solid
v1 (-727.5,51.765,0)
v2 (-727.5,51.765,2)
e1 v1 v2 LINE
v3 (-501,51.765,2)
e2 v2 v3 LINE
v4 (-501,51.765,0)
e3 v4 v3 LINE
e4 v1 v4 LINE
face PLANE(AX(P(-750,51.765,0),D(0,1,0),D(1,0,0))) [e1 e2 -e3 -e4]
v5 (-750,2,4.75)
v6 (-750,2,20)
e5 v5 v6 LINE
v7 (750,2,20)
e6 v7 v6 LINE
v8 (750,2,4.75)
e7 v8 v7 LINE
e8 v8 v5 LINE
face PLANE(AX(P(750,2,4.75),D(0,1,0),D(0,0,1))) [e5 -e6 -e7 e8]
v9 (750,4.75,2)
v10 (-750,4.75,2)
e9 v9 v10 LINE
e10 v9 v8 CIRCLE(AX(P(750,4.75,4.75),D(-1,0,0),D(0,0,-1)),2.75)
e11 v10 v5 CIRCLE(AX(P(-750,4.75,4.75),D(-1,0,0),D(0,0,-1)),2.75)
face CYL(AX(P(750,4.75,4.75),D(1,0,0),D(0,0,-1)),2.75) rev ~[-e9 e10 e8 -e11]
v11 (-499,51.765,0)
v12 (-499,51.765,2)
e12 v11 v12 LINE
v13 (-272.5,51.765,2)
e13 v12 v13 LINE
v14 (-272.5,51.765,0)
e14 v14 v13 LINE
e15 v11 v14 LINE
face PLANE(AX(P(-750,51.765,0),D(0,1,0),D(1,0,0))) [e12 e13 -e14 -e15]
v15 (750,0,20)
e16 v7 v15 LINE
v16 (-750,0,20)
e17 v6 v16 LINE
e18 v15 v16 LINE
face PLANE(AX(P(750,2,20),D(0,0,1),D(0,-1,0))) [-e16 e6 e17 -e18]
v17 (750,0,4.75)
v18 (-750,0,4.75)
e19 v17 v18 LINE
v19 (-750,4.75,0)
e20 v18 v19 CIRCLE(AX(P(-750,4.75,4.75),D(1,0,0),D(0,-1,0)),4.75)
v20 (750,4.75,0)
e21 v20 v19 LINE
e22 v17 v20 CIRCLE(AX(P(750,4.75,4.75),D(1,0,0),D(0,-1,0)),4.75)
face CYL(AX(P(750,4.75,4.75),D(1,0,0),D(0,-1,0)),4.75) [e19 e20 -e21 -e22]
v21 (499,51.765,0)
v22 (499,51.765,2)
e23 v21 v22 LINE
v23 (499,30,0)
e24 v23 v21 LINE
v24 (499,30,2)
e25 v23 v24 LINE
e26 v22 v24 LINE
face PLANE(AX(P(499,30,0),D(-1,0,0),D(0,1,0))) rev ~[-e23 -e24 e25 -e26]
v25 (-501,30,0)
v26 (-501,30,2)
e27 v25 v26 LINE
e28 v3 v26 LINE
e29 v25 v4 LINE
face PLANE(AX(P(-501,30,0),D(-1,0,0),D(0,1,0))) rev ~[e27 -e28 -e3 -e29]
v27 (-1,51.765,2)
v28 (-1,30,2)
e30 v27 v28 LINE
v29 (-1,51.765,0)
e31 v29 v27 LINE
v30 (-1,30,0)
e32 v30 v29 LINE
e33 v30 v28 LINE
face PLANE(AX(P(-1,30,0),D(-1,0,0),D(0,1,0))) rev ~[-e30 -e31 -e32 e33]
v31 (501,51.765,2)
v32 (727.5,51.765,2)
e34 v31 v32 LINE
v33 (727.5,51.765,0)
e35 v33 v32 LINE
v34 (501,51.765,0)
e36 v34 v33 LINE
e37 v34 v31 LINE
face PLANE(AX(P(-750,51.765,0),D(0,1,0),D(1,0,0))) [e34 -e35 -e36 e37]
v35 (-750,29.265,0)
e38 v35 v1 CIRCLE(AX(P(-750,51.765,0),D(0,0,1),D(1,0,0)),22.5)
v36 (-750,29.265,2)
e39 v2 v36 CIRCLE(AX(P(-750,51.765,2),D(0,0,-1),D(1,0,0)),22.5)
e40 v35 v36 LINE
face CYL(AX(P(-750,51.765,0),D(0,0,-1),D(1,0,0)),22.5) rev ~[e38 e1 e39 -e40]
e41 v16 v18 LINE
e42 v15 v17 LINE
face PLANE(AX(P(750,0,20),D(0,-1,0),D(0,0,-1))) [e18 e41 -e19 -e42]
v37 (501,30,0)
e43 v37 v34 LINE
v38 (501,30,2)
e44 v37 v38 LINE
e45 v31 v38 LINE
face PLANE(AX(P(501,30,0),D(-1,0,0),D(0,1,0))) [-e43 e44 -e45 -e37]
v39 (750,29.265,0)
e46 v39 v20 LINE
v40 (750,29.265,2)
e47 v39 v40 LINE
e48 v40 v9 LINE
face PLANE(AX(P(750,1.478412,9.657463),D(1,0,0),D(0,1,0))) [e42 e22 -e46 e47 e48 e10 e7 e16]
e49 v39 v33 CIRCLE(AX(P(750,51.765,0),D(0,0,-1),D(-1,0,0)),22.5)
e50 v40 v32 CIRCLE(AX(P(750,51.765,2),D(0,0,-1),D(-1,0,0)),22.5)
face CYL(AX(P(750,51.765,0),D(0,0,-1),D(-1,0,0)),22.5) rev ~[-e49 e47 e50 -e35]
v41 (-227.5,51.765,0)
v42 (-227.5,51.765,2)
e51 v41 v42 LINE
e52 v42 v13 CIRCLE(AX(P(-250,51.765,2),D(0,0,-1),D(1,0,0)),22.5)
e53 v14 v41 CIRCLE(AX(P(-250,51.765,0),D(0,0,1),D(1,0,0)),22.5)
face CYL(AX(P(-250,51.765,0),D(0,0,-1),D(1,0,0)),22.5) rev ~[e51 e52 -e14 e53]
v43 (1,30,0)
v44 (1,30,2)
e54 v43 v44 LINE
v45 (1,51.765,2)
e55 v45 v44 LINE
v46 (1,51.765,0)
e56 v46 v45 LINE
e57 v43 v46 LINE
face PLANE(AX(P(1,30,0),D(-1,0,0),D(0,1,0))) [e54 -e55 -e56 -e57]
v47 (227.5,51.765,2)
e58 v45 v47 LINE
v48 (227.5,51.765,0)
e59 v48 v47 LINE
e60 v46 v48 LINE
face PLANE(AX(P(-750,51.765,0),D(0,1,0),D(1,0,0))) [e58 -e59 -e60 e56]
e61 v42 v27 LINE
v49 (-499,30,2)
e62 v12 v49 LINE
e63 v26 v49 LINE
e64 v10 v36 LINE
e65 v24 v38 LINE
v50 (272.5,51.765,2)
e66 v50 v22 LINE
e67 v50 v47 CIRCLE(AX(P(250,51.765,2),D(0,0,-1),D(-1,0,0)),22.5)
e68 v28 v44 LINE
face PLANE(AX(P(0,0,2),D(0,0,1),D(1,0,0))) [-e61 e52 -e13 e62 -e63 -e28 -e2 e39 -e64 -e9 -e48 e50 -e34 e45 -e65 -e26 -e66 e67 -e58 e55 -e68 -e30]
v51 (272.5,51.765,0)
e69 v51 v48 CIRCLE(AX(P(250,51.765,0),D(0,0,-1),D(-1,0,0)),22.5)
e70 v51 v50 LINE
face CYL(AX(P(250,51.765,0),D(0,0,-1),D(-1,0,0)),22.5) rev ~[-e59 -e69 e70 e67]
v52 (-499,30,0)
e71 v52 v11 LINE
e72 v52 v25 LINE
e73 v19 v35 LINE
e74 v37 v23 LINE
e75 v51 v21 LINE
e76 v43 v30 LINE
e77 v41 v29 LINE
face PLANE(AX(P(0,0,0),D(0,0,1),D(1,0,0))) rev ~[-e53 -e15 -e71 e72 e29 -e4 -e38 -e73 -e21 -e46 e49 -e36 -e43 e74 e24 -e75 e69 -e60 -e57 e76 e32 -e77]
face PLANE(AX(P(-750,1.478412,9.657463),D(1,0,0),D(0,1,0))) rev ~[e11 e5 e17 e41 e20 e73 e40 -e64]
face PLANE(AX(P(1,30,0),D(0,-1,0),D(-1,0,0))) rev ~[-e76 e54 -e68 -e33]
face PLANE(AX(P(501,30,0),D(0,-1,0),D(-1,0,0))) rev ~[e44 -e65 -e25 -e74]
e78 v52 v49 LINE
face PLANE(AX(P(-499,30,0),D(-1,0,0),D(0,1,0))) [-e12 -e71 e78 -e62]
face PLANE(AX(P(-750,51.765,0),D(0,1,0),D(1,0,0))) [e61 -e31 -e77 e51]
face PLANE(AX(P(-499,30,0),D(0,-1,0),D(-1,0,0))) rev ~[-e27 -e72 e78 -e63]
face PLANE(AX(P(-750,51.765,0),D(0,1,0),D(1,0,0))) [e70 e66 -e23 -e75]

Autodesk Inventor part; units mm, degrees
ref_plane "YZ Plane" through (0, 0, 0) normal (1, 0, 0) x (0, 1, 0)
ref_plane "XZ Plane" through (0, 0, 0) normal (0, 1, 0) x (-1, 0, 0)
ref_plane "XY Plane" through (0, 0, 0) normal (0, 0, 1) x (1, 0, 0)
sketch "Sketch1" plane through (0, 0, 0) normal (0, 0, 1) x (1, 0, 0)
  line L0 (-750, 51.765) -> (750, 51.765)
  line L1 (750, 51.765) -> (750, 0)
  line L2 (750, 0) -> (-750, 0)
  line L3 (-750, 0) -> (-750, 51.765)
  point P0 (0, 0)
  point P1 (0, 0)
  dimension "d0" = 1500
  dimension "d1" = 51.765
extrude "Plate1" add sketch "Sketch1" along normal blind 2
sketch "Sketch2" plane through (750, 2, 0) normal (0, -1, 0) x (1, 0, 0)
  line L0 (-1500, 0) -> (0, 0)
  line L1 (0, 0) -> (0, 20)
  line L2 (0, 20) -> (-1500, 20)
  line L3 (-1500, 20) -> (-1500, 0)
edge flange "Flange1" height 20 angle 90 thickness 2 bend radius 2.75 thickness toward (0, -1, 0) relief round relief width 2 relief depth 1 edges at (0, 0, 2) wall of the first edge with corners at (-750, 2, 0) (750, 2, 0) (750, 2, 20) (-750, 2, 20)
bend "Bend1"
corner "Corner1"
sketch "Sketch5" plane through (0, 0, 0) normal (0, 0, -1) x (-1, 0, 0)
  line L0 (750, 51.765) -> (-750, 51.765) projected
  line L1 (-1, 30) -> (-1, 51.765)
  line L2 (750, 0) -> (-750, 0) projected
  line L3 (-1, 30) -> (1, 30)
  line L4 (1, 30) -> (1, 51.765)
  point P0 (0, 0)
  point P1 (0, 30)
  point P2 (0, 0)
  dimension "d27" = 2
  dimension "d29" = 30
extrude "Extrusion1" cut sketch "Sketch5" against normal through all
pattern_linear "Rectangular Pattern1" count 3 spacing 500 along (1, 0, 0) of "Extrusion1" first direction both ways yes
sketch "Sketch6" plane through (0, 0, 0) normal (0, 0, -1) x (-1, 0, 0)
  line L0 (-750, 51.765) -> (-750, 4.75) projected
  circle A0 centre (-750, 51.765) radius 22.5
  line L1 (-750, 51.765) -> (750, 51.765) projected
  line L2 (-499, 30) -> (-501, 30) construction
  line L3 (-499, 30) -> (-1, 30) construction
  line L4 (-1, 30) -> (-1, 51.765) construction
  line L5 (-1, 51.765) -> (-499, 51.765) projected
  circle A1 centre (-250, 51.765) radius 22.5
  point P0 (0, 0)
  point P1 (-727.5, 51.765)
  point P2 (-750, 29.265)
  point P3 (-250, 30)
  point P4 (-227.5, 51.765)
  point P5 (-272.5, 51.765)
  dimension "d24" = 45
extrude "Extrusion2" cut sketch "Sketch6" against normal through all contours L1 A0 L0 | L1 A1 picked at (-748.3311, 36.953) picked at (-248.2369, 40.8343)
mirror "Mirror1" about plane through (0, 0, 0) normal (1, 0, 0) of "Extrusion2"
sketch "Sketch7" plane through (0, 0, 2) normal (0, 0, 1) x (1, 0, 0)
  arc A0 (-750, 29.265) -> (-727.5, 51.765) centre (-750, 51.765) ccw projected
  line L0 (-750, 4.75) -> (-750, 29.265) projected
  line L1 (-750, 4.75) -> (750, 4.75) projected
  line L2 (750, 29.265) -> (750, 4.75) projected
  arc A1 (727.5, 51.765) -> (750, 29.265) centre (750, 51.765) ccw projected
  line L3 (501, 51.765) -> (727.5, 51.765) projected
  line L4 (501, 51.765) -> (501, 30) projected
  line L5 (501, 30) -> (499, 30) projected
  line L6 (499, 30) -> (499, 51.765) projected
  line L7 (1, 51.765) -> (227.5, 51.765) projected
  line L8 (1, 51.765) -> (1, 30) projected
  line L9 (1, 30) -> (-1, 30) projected
  line L10 (-1, 30) -> (-1, 51.765) projected
  line L11 (-499, 51.765) -> (-272.5, 51.765) projected
  line L12 (-499, 51.765) -> (-499, 30) projected
  line L13 (-499, 30) -> (-501, 30) projected
  line L14 (-501, 30) -> (-501, 51.765) projected
  line L15 (-727.5, 51.765) -> (-501, 51.765) projected
  line L16 (649, 50.765) -> (651, 50.765)
  line L17 (651, 50.765) -> (651, 51.765)
  line L18 (651, 51.765) -> (649, 51.765)
  line L19 (649, 51.765) -> (649, 50.765)
  line L20 (650, 4.75) -> (650, 51.765) construction
  line L21 (272.5, 51.765) -> (499, 51.765) projected
  arc A2 (227.5, 51.765) -> (272.5, 51.765) centre (250, 51.765) ccw projected
  line L22 (-227.5, 51.765) -> (-1, 51.765) projected
  arc A3 (-272.5, 51.765) -> (-227.5, 51.765) centre (-250, 51.765) ccw projected
  point P0 (0, 0)
  point P1 (650, 50.765)
  point P2 (649, 51.265)
  point P3 (650, 28.2575)
  dimension "d30" = 2
  dimension "d31" = 1
  dimension "d33" = 100
extrude "Extrusion3" [suppressed]
mirror "Mirror2" [suppressed]
sketch "Sketch9" plane through (0, 0, 2) normal (0, 0, 1) x (1, 0, 0)
  line L0 (494, 46.765) -> (494, 34.765) construction
  line L1 (494, 34.765) -> (294, 34.765) construction
  line L2 (294, 34.765) -> (294, 46.765) construction
  line L3 (294, 46.765) -> (494, 46.765) construction
  line L4 (499, 30) -> (499, 51.765) projected
  line L5 (1, 51.765) -> (499, 51.765) projected
  point P0 (0, 0)
  dimension "d38" = 200
  dimension "d39" = 12
  dimension "d42" = 5
  dimension "d43" = 5
mark "Mark3"
equation "\"d1\" = Стрингер_1"
equation "\"d27\" = d18"
equation "\"d29\" = Стрингер_глубина_паза"
equation "\"d43\" = d42"
equation "\"d2\" = Thickness"
equation "\"d3\" = BendReliefWidth"
equation "\"d4\" = BendReliefDepth"
equation "\"d5\" = MinimumRemnant"
equation "\"d6\" = TransitionRadius"
equation "\"d9\" = BendRadius"
equation "\"d10\" = CornerReliefSize"
equation "\"d11\" = GapSize"
equation "\"d12\" = JacobiRadiusSize"
equation "\"BendReliefWidth\" = Thickness"
equation "\"BendReliefDepth\" = 0.5 * Thickness"
equation "\"CornerReliefSize\" = 4 * Thickness"
equation "\"MinimumRemnant\" = 2 * Thickness"
equation "\"TransitionRadius\" = BendRadius"
equation "\"JacobiRadiusSize\" = BendRadius"
equation "\"GapSize\" = Thickness"
equation "\"d18\" = Thickness"
equation "\"qqqqqq\" = 67.35706"
equation "\"Стрингер_1\" = 51.765032"
equation "\"Стрингер_глубина_паза\" = 30"
equation "\"Thickness\" = 2"
equation "\"BendRadius\" = 2.75"
properties part number "MSC 061 stringer back ^" material "Stainless Steel"
